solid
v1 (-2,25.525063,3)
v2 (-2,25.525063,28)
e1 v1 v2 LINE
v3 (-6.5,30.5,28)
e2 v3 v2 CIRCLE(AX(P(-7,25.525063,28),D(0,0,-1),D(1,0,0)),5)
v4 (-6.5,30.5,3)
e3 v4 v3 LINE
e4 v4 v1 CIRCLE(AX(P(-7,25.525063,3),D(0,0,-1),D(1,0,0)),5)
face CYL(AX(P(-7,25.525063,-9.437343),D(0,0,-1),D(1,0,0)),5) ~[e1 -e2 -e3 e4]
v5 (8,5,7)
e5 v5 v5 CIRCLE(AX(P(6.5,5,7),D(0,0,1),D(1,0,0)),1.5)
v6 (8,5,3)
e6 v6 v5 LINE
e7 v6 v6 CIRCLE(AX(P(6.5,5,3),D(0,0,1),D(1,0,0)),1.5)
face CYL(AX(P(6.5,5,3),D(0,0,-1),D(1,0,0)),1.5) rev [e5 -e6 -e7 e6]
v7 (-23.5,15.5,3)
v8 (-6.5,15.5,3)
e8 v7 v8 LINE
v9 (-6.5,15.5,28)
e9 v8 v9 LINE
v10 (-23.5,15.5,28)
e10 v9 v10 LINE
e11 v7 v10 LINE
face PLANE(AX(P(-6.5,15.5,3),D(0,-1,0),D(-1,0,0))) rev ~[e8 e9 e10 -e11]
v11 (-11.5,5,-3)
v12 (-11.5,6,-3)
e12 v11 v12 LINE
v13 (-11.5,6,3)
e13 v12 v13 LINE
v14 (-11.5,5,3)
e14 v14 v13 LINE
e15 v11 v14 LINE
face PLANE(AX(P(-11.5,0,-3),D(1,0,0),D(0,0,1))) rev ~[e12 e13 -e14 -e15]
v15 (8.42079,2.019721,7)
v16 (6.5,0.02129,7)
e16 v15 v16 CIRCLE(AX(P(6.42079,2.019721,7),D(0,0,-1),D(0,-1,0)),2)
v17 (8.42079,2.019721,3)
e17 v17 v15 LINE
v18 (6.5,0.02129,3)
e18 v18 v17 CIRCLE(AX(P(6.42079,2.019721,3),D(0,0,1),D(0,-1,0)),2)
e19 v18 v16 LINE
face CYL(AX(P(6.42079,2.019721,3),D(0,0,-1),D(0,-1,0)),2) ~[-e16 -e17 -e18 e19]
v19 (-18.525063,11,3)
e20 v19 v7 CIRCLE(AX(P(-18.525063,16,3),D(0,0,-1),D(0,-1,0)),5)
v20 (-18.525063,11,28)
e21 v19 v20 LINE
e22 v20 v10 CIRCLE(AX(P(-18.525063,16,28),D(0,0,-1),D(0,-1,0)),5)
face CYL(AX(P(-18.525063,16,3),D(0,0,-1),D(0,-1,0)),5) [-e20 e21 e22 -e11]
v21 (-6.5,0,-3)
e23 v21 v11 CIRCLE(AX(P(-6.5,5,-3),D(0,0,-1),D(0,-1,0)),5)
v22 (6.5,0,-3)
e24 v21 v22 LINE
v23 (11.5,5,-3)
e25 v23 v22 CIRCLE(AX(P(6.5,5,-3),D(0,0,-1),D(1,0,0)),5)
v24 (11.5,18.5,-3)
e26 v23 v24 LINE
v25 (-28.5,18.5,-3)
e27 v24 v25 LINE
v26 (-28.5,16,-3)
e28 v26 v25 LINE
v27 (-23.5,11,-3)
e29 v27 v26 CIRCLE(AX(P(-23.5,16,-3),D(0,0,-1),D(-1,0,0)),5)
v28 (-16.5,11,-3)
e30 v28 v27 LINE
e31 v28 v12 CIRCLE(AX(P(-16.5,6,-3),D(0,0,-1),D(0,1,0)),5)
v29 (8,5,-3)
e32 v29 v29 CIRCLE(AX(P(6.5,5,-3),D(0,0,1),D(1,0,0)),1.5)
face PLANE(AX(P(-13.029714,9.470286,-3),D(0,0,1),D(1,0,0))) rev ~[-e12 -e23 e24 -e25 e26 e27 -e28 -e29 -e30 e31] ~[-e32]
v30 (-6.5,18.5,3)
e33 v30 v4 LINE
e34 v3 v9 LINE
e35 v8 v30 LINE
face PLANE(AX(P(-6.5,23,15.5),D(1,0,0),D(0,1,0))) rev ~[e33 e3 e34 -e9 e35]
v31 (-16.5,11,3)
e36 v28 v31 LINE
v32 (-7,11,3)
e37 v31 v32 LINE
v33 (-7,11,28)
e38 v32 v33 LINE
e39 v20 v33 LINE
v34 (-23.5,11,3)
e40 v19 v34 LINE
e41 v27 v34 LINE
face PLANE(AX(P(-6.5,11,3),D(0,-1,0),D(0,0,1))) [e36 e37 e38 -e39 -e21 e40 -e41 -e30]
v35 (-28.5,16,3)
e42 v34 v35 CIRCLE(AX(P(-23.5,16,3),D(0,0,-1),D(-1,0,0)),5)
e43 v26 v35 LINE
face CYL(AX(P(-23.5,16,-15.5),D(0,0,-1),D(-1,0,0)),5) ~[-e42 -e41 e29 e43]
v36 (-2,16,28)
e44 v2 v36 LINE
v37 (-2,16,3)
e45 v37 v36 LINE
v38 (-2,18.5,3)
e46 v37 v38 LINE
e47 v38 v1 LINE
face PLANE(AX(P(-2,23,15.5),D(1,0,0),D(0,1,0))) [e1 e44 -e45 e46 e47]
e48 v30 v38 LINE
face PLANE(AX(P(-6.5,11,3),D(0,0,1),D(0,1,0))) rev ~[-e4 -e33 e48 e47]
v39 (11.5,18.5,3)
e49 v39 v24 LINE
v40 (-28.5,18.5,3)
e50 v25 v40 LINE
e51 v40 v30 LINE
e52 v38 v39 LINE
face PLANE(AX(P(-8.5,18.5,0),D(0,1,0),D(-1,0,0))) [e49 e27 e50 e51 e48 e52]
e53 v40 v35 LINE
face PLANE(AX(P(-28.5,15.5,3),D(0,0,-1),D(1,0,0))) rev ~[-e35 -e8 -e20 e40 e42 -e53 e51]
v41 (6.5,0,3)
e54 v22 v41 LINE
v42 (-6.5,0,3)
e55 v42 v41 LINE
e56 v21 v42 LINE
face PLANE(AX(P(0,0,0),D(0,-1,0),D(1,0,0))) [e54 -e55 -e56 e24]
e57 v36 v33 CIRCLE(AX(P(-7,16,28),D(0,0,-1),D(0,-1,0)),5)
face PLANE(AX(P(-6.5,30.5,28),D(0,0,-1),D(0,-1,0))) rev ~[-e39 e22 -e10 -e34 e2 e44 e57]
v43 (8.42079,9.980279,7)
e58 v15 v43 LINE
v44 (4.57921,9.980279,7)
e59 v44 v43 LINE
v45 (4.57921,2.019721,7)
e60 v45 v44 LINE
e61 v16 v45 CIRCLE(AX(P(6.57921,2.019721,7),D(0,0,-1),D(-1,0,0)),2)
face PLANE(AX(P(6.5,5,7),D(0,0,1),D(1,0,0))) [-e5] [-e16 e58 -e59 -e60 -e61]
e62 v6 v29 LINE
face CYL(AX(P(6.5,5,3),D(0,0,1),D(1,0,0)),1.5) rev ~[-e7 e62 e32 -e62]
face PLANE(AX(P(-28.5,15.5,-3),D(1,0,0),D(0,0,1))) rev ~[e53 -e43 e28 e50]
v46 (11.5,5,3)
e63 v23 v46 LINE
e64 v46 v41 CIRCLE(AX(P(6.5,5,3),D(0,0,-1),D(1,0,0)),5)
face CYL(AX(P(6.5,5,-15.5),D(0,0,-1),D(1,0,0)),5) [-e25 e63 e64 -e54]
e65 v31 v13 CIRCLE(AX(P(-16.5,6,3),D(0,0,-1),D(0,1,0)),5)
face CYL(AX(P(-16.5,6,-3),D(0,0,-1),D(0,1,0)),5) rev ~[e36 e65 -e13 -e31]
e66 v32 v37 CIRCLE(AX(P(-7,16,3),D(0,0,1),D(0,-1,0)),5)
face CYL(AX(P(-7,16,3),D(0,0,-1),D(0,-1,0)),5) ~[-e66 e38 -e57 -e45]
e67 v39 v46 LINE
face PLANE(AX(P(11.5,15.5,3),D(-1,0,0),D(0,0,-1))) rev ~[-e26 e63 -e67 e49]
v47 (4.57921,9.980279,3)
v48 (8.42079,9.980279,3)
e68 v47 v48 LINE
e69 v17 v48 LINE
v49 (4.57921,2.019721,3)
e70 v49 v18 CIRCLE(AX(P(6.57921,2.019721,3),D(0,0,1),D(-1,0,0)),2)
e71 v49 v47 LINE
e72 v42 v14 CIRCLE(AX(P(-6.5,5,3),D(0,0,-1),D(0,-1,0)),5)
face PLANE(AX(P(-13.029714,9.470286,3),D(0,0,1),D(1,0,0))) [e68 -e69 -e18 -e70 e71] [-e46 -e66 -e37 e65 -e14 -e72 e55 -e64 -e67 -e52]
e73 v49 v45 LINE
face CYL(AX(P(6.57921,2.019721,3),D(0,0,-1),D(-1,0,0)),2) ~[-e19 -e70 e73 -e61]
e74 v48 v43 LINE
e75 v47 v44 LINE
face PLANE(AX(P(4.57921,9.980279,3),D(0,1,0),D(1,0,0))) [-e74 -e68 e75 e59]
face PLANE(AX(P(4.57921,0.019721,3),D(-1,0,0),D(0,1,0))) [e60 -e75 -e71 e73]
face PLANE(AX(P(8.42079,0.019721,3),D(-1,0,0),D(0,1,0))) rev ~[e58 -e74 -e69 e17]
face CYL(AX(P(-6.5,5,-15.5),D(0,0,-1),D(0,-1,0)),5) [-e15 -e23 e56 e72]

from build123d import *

# Parameters (mm, degrees)
F0_W          = 23
F0_H          = 6
F1_DEPTH      = 11
F2_W          = 3.8415808491
F2_H          = 9.9605580419
F2_R          = 1.5
F3_DEPTH      = 4
F4_DEPTH      = 6
F5_T1_DEPTH   = 9
F6_W          = 23
F6_H          = 6
F6_W_2        = 17
F7_DEPTH      = 4.5
F8_W          = 12
F8_H          = 4.5
F8_W_2        = 5
F9_DEPTH      = 25
F11_DEPTH     = 3
F12_W         = 15
F12_H         = 25
F12_W_2       = 4.5
F13_DEPTH     = 4.5
F14_T1_DEPTH  = 6
F14_T3_DEPTH  = 49.8746859277
F14_T5_DEPTH  = 37.5
F14_T7_DEPTH  = 37.4373429638
F14_T9_DEPTH  = 31
F14_T11_DEPTH = 31
F14_T13_DEPTH = 31


# Not quite as in the source:
# - a fillet or chamfer that OpenCascade refuses, or shapes differently, is made with other operations: its cross-section is extruded or revolved along the edge and cut away or added


with BuildPart() as f1:
    # F0 (on Front) → F1 (new body)
    with BuildSketch(Plane.XZ):
        Rectangle(F0_W, F0_H)
    extrude(amount=-F1_DEPTH)

    # F2 (on face) → F3 (join)
    with BuildSketch(Plane.XY.offset(3)):
        with Locations((6.5, 5)):
            Rectangle(F2_W, F2_H)
        with Locations((6.5, 5)):
            Circle(F2_R, mode=Mode.SUBTRACT)
    extrude(amount=F3_DEPTH)

    # F4 (cut): a face of the model
    f4_faces = [f1.faces().sort_by_distance(p)[0] for p in [
        (6.5, 5, 3),
    ]]
    extrude(f4_faces, amount=-F4_DEPTH, mode=Mode.SUBTRACT)

    # F5: fillet of radius 2 on 2 edges, made by hand

    # F5_s2 → F5_t1 (cut)
    with BuildSketch(Plane.XY.offset(3)):
        with BuildLine():
            ThreePointArc((6.4207904246, 0.019720979), (7.8350039869, 0.6055074167), (8.4207904246, 2.019720979))
            Line((8.4207904246, 2.019720979), (8.4207904246, 0.019720979))
            Line((8.4207904246, 0.019720979), (6.4207904246, 0.019720979))
        make_face()
        with BuildLine():
            ThreePointArc((4.5792095754, 2.019720979), (5.1649960131, 0.6055074167), (6.5792095754, 0.019720979))
            Line((6.5792095754, 0.019720979), (4.5792095754, 0.019720979))
            Line((4.5792095754, 0.019720979), (4.5792095754, 2.019720979))
        make_face()
    extrude(amount=F5_T1_DEPTH, mode=Mode.SUBTRACT)

    # F6 (on face) → F7 (join)
    with BuildSketch(Plane(origin=(0, 11, 0), x_dir=(-1, 0, 0), z_dir=(0, 1, 0))):
        Rectangle(F6_W, F6_H)
        with Locations((20, 0)):
            Rectangle(F6_W_2, F6_H)
    extrude(amount=F7_DEPTH)

    # F8 (on face) → F9 (join)
    with BuildSketch(Plane.XY.offset(3)):
        with Locations((-17.5, 13.25)):
            Rectangle(F8_W, F8_H)
        with Locations((-9, 13.25)):
            Rectangle(F8_W_2, F8_H)
    extrude(amount=F9_DEPTH)

    # F10 (on face) → F11 (join)
    with BuildSketch(Plane(origin=(0, 15.5, 0), x_dir=(-1, 0, 0), z_dir=(0, 1, 0))):
        Polygon((6.5, 3), (-11.5, 3), (-11.5, -3), (28.5, -3), (28.5, 3), (23.5, 3), align=None)
    extrude(amount=F11_DEPTH)

    # F12 (on face) → F13 (join)
    with BuildSketch(Plane.YZ.offset(-6.5)):
        with Locations((23, 15.5)):
            Rectangle(F12_W, F12_H)
        with Locations((13.25, 15.5)):
            Rectangle(F12_W_2, F12_H)
    extrude(amount=F13_DEPTH)

    # F14: fillet of radius 5 on 7 edges, made by hand

    # F14_s2 → F14_t1 (join)
    with BuildSketch(Plane.XY.offset(-3)):
        with BuildLine():
            ThreePointArc((-16.5, 11), (-12.9644660941, 9.5355339059), (-11.5, 6))
            Line((-11.5, 6), (-11.5, 11))
            Line((-11.5, 11), (-16.5, 11))
        make_face()
    extrude(amount=F14_T1_DEPTH)

    # F14_s4 → F14_t3 (cut)
    with BuildSketch(Plane.XY.offset(-9.4373429638)):
        with BuildLine():
            ThreePointArc((-2, 25.5250628145), (-3.2919007565, 28.8791647807), (-6.5, 30.5))
            Line((-6.5, 30.5), (-2, 30.5))
            Line((-2, 30.5), (-2, 25.5250628145))
        make_face()
    extrude(amount=F14_T3_DEPTH, mode=Mode.SUBTRACT)

    # F14_s6 → F14_t5 (cut)
    with BuildSketch(Plane.XY.offset(3)):
        with BuildLine():
            ThreePointArc((-7, 11), (-3.4644660941, 12.4644660941), (-2, 16))
            Line((-2, 16), (-2, 11))
            Line((-2, 11), (-7, 11))
        make_face()
    extrude(amount=F14_T5_DEPTH, mode=Mode.SUBTRACT)

    # F14_s8 → F14_t7 (cut)
    with BuildSketch(Plane.XY.offset(3)):
        with BuildLine():
            ThreePointArc((-18.5250628145, 11), (-21.8791647807, 12.2919007565), (-23.5, 15.5))
            Line((-23.5, 15.5), (-23.5, 11))
            Line((-23.5, 11), (-18.5250628145, 11))
        make_face()
    extrude(amount=F14_T7_DEPTH, mode=Mode.SUBTRACT)

    # F14_s10 → F14_t9 (cut)
    with BuildSketch(Plane.XY.offset(-15.5)):
        with BuildLine():
            ThreePointArc((11.5, 5), (10.0355339059, 1.4644660941), (6.5, 0))
            Line((6.5, 0), (11.5, 0))
            Line((11.5, 0), (11.5, 5))
        make_face()
    extrude(amount=F14_T9_DEPTH, mode=Mode.SUBTRACT)

    # F14_s12 → F14_t11 (cut)
    with BuildSketch(Plane.XY.offset(-15.5)):
        with BuildLine():
            ThreePointArc((-6.5, 0), (-10.0355339059, 1.4644660941), (-11.5, 5))
            Line((-11.5, 5), (-11.5, 0))
            Line((-11.5, 0), (-6.5, 0))
        make_face()
    extrude(amount=F14_T11_DEPTH, mode=Mode.SUBTRACT)

    # F14_s14 → F14_t13 (cut)
    with BuildSketch(Plane.XY.offset(-15.5)):
        with BuildLine():
            ThreePointArc((-28.5, 16), (-27.0355339059, 12.4644660941), (-23.5, 11))
            Line((-23.5, 11), (-28.5, 11))
            Line((-28.5, 11), (-28.5, 16))
        make_face()
    extrude(amount=F14_T13_DEPTH, mode=Mode.SUBTRACT)


solid = f1.part
